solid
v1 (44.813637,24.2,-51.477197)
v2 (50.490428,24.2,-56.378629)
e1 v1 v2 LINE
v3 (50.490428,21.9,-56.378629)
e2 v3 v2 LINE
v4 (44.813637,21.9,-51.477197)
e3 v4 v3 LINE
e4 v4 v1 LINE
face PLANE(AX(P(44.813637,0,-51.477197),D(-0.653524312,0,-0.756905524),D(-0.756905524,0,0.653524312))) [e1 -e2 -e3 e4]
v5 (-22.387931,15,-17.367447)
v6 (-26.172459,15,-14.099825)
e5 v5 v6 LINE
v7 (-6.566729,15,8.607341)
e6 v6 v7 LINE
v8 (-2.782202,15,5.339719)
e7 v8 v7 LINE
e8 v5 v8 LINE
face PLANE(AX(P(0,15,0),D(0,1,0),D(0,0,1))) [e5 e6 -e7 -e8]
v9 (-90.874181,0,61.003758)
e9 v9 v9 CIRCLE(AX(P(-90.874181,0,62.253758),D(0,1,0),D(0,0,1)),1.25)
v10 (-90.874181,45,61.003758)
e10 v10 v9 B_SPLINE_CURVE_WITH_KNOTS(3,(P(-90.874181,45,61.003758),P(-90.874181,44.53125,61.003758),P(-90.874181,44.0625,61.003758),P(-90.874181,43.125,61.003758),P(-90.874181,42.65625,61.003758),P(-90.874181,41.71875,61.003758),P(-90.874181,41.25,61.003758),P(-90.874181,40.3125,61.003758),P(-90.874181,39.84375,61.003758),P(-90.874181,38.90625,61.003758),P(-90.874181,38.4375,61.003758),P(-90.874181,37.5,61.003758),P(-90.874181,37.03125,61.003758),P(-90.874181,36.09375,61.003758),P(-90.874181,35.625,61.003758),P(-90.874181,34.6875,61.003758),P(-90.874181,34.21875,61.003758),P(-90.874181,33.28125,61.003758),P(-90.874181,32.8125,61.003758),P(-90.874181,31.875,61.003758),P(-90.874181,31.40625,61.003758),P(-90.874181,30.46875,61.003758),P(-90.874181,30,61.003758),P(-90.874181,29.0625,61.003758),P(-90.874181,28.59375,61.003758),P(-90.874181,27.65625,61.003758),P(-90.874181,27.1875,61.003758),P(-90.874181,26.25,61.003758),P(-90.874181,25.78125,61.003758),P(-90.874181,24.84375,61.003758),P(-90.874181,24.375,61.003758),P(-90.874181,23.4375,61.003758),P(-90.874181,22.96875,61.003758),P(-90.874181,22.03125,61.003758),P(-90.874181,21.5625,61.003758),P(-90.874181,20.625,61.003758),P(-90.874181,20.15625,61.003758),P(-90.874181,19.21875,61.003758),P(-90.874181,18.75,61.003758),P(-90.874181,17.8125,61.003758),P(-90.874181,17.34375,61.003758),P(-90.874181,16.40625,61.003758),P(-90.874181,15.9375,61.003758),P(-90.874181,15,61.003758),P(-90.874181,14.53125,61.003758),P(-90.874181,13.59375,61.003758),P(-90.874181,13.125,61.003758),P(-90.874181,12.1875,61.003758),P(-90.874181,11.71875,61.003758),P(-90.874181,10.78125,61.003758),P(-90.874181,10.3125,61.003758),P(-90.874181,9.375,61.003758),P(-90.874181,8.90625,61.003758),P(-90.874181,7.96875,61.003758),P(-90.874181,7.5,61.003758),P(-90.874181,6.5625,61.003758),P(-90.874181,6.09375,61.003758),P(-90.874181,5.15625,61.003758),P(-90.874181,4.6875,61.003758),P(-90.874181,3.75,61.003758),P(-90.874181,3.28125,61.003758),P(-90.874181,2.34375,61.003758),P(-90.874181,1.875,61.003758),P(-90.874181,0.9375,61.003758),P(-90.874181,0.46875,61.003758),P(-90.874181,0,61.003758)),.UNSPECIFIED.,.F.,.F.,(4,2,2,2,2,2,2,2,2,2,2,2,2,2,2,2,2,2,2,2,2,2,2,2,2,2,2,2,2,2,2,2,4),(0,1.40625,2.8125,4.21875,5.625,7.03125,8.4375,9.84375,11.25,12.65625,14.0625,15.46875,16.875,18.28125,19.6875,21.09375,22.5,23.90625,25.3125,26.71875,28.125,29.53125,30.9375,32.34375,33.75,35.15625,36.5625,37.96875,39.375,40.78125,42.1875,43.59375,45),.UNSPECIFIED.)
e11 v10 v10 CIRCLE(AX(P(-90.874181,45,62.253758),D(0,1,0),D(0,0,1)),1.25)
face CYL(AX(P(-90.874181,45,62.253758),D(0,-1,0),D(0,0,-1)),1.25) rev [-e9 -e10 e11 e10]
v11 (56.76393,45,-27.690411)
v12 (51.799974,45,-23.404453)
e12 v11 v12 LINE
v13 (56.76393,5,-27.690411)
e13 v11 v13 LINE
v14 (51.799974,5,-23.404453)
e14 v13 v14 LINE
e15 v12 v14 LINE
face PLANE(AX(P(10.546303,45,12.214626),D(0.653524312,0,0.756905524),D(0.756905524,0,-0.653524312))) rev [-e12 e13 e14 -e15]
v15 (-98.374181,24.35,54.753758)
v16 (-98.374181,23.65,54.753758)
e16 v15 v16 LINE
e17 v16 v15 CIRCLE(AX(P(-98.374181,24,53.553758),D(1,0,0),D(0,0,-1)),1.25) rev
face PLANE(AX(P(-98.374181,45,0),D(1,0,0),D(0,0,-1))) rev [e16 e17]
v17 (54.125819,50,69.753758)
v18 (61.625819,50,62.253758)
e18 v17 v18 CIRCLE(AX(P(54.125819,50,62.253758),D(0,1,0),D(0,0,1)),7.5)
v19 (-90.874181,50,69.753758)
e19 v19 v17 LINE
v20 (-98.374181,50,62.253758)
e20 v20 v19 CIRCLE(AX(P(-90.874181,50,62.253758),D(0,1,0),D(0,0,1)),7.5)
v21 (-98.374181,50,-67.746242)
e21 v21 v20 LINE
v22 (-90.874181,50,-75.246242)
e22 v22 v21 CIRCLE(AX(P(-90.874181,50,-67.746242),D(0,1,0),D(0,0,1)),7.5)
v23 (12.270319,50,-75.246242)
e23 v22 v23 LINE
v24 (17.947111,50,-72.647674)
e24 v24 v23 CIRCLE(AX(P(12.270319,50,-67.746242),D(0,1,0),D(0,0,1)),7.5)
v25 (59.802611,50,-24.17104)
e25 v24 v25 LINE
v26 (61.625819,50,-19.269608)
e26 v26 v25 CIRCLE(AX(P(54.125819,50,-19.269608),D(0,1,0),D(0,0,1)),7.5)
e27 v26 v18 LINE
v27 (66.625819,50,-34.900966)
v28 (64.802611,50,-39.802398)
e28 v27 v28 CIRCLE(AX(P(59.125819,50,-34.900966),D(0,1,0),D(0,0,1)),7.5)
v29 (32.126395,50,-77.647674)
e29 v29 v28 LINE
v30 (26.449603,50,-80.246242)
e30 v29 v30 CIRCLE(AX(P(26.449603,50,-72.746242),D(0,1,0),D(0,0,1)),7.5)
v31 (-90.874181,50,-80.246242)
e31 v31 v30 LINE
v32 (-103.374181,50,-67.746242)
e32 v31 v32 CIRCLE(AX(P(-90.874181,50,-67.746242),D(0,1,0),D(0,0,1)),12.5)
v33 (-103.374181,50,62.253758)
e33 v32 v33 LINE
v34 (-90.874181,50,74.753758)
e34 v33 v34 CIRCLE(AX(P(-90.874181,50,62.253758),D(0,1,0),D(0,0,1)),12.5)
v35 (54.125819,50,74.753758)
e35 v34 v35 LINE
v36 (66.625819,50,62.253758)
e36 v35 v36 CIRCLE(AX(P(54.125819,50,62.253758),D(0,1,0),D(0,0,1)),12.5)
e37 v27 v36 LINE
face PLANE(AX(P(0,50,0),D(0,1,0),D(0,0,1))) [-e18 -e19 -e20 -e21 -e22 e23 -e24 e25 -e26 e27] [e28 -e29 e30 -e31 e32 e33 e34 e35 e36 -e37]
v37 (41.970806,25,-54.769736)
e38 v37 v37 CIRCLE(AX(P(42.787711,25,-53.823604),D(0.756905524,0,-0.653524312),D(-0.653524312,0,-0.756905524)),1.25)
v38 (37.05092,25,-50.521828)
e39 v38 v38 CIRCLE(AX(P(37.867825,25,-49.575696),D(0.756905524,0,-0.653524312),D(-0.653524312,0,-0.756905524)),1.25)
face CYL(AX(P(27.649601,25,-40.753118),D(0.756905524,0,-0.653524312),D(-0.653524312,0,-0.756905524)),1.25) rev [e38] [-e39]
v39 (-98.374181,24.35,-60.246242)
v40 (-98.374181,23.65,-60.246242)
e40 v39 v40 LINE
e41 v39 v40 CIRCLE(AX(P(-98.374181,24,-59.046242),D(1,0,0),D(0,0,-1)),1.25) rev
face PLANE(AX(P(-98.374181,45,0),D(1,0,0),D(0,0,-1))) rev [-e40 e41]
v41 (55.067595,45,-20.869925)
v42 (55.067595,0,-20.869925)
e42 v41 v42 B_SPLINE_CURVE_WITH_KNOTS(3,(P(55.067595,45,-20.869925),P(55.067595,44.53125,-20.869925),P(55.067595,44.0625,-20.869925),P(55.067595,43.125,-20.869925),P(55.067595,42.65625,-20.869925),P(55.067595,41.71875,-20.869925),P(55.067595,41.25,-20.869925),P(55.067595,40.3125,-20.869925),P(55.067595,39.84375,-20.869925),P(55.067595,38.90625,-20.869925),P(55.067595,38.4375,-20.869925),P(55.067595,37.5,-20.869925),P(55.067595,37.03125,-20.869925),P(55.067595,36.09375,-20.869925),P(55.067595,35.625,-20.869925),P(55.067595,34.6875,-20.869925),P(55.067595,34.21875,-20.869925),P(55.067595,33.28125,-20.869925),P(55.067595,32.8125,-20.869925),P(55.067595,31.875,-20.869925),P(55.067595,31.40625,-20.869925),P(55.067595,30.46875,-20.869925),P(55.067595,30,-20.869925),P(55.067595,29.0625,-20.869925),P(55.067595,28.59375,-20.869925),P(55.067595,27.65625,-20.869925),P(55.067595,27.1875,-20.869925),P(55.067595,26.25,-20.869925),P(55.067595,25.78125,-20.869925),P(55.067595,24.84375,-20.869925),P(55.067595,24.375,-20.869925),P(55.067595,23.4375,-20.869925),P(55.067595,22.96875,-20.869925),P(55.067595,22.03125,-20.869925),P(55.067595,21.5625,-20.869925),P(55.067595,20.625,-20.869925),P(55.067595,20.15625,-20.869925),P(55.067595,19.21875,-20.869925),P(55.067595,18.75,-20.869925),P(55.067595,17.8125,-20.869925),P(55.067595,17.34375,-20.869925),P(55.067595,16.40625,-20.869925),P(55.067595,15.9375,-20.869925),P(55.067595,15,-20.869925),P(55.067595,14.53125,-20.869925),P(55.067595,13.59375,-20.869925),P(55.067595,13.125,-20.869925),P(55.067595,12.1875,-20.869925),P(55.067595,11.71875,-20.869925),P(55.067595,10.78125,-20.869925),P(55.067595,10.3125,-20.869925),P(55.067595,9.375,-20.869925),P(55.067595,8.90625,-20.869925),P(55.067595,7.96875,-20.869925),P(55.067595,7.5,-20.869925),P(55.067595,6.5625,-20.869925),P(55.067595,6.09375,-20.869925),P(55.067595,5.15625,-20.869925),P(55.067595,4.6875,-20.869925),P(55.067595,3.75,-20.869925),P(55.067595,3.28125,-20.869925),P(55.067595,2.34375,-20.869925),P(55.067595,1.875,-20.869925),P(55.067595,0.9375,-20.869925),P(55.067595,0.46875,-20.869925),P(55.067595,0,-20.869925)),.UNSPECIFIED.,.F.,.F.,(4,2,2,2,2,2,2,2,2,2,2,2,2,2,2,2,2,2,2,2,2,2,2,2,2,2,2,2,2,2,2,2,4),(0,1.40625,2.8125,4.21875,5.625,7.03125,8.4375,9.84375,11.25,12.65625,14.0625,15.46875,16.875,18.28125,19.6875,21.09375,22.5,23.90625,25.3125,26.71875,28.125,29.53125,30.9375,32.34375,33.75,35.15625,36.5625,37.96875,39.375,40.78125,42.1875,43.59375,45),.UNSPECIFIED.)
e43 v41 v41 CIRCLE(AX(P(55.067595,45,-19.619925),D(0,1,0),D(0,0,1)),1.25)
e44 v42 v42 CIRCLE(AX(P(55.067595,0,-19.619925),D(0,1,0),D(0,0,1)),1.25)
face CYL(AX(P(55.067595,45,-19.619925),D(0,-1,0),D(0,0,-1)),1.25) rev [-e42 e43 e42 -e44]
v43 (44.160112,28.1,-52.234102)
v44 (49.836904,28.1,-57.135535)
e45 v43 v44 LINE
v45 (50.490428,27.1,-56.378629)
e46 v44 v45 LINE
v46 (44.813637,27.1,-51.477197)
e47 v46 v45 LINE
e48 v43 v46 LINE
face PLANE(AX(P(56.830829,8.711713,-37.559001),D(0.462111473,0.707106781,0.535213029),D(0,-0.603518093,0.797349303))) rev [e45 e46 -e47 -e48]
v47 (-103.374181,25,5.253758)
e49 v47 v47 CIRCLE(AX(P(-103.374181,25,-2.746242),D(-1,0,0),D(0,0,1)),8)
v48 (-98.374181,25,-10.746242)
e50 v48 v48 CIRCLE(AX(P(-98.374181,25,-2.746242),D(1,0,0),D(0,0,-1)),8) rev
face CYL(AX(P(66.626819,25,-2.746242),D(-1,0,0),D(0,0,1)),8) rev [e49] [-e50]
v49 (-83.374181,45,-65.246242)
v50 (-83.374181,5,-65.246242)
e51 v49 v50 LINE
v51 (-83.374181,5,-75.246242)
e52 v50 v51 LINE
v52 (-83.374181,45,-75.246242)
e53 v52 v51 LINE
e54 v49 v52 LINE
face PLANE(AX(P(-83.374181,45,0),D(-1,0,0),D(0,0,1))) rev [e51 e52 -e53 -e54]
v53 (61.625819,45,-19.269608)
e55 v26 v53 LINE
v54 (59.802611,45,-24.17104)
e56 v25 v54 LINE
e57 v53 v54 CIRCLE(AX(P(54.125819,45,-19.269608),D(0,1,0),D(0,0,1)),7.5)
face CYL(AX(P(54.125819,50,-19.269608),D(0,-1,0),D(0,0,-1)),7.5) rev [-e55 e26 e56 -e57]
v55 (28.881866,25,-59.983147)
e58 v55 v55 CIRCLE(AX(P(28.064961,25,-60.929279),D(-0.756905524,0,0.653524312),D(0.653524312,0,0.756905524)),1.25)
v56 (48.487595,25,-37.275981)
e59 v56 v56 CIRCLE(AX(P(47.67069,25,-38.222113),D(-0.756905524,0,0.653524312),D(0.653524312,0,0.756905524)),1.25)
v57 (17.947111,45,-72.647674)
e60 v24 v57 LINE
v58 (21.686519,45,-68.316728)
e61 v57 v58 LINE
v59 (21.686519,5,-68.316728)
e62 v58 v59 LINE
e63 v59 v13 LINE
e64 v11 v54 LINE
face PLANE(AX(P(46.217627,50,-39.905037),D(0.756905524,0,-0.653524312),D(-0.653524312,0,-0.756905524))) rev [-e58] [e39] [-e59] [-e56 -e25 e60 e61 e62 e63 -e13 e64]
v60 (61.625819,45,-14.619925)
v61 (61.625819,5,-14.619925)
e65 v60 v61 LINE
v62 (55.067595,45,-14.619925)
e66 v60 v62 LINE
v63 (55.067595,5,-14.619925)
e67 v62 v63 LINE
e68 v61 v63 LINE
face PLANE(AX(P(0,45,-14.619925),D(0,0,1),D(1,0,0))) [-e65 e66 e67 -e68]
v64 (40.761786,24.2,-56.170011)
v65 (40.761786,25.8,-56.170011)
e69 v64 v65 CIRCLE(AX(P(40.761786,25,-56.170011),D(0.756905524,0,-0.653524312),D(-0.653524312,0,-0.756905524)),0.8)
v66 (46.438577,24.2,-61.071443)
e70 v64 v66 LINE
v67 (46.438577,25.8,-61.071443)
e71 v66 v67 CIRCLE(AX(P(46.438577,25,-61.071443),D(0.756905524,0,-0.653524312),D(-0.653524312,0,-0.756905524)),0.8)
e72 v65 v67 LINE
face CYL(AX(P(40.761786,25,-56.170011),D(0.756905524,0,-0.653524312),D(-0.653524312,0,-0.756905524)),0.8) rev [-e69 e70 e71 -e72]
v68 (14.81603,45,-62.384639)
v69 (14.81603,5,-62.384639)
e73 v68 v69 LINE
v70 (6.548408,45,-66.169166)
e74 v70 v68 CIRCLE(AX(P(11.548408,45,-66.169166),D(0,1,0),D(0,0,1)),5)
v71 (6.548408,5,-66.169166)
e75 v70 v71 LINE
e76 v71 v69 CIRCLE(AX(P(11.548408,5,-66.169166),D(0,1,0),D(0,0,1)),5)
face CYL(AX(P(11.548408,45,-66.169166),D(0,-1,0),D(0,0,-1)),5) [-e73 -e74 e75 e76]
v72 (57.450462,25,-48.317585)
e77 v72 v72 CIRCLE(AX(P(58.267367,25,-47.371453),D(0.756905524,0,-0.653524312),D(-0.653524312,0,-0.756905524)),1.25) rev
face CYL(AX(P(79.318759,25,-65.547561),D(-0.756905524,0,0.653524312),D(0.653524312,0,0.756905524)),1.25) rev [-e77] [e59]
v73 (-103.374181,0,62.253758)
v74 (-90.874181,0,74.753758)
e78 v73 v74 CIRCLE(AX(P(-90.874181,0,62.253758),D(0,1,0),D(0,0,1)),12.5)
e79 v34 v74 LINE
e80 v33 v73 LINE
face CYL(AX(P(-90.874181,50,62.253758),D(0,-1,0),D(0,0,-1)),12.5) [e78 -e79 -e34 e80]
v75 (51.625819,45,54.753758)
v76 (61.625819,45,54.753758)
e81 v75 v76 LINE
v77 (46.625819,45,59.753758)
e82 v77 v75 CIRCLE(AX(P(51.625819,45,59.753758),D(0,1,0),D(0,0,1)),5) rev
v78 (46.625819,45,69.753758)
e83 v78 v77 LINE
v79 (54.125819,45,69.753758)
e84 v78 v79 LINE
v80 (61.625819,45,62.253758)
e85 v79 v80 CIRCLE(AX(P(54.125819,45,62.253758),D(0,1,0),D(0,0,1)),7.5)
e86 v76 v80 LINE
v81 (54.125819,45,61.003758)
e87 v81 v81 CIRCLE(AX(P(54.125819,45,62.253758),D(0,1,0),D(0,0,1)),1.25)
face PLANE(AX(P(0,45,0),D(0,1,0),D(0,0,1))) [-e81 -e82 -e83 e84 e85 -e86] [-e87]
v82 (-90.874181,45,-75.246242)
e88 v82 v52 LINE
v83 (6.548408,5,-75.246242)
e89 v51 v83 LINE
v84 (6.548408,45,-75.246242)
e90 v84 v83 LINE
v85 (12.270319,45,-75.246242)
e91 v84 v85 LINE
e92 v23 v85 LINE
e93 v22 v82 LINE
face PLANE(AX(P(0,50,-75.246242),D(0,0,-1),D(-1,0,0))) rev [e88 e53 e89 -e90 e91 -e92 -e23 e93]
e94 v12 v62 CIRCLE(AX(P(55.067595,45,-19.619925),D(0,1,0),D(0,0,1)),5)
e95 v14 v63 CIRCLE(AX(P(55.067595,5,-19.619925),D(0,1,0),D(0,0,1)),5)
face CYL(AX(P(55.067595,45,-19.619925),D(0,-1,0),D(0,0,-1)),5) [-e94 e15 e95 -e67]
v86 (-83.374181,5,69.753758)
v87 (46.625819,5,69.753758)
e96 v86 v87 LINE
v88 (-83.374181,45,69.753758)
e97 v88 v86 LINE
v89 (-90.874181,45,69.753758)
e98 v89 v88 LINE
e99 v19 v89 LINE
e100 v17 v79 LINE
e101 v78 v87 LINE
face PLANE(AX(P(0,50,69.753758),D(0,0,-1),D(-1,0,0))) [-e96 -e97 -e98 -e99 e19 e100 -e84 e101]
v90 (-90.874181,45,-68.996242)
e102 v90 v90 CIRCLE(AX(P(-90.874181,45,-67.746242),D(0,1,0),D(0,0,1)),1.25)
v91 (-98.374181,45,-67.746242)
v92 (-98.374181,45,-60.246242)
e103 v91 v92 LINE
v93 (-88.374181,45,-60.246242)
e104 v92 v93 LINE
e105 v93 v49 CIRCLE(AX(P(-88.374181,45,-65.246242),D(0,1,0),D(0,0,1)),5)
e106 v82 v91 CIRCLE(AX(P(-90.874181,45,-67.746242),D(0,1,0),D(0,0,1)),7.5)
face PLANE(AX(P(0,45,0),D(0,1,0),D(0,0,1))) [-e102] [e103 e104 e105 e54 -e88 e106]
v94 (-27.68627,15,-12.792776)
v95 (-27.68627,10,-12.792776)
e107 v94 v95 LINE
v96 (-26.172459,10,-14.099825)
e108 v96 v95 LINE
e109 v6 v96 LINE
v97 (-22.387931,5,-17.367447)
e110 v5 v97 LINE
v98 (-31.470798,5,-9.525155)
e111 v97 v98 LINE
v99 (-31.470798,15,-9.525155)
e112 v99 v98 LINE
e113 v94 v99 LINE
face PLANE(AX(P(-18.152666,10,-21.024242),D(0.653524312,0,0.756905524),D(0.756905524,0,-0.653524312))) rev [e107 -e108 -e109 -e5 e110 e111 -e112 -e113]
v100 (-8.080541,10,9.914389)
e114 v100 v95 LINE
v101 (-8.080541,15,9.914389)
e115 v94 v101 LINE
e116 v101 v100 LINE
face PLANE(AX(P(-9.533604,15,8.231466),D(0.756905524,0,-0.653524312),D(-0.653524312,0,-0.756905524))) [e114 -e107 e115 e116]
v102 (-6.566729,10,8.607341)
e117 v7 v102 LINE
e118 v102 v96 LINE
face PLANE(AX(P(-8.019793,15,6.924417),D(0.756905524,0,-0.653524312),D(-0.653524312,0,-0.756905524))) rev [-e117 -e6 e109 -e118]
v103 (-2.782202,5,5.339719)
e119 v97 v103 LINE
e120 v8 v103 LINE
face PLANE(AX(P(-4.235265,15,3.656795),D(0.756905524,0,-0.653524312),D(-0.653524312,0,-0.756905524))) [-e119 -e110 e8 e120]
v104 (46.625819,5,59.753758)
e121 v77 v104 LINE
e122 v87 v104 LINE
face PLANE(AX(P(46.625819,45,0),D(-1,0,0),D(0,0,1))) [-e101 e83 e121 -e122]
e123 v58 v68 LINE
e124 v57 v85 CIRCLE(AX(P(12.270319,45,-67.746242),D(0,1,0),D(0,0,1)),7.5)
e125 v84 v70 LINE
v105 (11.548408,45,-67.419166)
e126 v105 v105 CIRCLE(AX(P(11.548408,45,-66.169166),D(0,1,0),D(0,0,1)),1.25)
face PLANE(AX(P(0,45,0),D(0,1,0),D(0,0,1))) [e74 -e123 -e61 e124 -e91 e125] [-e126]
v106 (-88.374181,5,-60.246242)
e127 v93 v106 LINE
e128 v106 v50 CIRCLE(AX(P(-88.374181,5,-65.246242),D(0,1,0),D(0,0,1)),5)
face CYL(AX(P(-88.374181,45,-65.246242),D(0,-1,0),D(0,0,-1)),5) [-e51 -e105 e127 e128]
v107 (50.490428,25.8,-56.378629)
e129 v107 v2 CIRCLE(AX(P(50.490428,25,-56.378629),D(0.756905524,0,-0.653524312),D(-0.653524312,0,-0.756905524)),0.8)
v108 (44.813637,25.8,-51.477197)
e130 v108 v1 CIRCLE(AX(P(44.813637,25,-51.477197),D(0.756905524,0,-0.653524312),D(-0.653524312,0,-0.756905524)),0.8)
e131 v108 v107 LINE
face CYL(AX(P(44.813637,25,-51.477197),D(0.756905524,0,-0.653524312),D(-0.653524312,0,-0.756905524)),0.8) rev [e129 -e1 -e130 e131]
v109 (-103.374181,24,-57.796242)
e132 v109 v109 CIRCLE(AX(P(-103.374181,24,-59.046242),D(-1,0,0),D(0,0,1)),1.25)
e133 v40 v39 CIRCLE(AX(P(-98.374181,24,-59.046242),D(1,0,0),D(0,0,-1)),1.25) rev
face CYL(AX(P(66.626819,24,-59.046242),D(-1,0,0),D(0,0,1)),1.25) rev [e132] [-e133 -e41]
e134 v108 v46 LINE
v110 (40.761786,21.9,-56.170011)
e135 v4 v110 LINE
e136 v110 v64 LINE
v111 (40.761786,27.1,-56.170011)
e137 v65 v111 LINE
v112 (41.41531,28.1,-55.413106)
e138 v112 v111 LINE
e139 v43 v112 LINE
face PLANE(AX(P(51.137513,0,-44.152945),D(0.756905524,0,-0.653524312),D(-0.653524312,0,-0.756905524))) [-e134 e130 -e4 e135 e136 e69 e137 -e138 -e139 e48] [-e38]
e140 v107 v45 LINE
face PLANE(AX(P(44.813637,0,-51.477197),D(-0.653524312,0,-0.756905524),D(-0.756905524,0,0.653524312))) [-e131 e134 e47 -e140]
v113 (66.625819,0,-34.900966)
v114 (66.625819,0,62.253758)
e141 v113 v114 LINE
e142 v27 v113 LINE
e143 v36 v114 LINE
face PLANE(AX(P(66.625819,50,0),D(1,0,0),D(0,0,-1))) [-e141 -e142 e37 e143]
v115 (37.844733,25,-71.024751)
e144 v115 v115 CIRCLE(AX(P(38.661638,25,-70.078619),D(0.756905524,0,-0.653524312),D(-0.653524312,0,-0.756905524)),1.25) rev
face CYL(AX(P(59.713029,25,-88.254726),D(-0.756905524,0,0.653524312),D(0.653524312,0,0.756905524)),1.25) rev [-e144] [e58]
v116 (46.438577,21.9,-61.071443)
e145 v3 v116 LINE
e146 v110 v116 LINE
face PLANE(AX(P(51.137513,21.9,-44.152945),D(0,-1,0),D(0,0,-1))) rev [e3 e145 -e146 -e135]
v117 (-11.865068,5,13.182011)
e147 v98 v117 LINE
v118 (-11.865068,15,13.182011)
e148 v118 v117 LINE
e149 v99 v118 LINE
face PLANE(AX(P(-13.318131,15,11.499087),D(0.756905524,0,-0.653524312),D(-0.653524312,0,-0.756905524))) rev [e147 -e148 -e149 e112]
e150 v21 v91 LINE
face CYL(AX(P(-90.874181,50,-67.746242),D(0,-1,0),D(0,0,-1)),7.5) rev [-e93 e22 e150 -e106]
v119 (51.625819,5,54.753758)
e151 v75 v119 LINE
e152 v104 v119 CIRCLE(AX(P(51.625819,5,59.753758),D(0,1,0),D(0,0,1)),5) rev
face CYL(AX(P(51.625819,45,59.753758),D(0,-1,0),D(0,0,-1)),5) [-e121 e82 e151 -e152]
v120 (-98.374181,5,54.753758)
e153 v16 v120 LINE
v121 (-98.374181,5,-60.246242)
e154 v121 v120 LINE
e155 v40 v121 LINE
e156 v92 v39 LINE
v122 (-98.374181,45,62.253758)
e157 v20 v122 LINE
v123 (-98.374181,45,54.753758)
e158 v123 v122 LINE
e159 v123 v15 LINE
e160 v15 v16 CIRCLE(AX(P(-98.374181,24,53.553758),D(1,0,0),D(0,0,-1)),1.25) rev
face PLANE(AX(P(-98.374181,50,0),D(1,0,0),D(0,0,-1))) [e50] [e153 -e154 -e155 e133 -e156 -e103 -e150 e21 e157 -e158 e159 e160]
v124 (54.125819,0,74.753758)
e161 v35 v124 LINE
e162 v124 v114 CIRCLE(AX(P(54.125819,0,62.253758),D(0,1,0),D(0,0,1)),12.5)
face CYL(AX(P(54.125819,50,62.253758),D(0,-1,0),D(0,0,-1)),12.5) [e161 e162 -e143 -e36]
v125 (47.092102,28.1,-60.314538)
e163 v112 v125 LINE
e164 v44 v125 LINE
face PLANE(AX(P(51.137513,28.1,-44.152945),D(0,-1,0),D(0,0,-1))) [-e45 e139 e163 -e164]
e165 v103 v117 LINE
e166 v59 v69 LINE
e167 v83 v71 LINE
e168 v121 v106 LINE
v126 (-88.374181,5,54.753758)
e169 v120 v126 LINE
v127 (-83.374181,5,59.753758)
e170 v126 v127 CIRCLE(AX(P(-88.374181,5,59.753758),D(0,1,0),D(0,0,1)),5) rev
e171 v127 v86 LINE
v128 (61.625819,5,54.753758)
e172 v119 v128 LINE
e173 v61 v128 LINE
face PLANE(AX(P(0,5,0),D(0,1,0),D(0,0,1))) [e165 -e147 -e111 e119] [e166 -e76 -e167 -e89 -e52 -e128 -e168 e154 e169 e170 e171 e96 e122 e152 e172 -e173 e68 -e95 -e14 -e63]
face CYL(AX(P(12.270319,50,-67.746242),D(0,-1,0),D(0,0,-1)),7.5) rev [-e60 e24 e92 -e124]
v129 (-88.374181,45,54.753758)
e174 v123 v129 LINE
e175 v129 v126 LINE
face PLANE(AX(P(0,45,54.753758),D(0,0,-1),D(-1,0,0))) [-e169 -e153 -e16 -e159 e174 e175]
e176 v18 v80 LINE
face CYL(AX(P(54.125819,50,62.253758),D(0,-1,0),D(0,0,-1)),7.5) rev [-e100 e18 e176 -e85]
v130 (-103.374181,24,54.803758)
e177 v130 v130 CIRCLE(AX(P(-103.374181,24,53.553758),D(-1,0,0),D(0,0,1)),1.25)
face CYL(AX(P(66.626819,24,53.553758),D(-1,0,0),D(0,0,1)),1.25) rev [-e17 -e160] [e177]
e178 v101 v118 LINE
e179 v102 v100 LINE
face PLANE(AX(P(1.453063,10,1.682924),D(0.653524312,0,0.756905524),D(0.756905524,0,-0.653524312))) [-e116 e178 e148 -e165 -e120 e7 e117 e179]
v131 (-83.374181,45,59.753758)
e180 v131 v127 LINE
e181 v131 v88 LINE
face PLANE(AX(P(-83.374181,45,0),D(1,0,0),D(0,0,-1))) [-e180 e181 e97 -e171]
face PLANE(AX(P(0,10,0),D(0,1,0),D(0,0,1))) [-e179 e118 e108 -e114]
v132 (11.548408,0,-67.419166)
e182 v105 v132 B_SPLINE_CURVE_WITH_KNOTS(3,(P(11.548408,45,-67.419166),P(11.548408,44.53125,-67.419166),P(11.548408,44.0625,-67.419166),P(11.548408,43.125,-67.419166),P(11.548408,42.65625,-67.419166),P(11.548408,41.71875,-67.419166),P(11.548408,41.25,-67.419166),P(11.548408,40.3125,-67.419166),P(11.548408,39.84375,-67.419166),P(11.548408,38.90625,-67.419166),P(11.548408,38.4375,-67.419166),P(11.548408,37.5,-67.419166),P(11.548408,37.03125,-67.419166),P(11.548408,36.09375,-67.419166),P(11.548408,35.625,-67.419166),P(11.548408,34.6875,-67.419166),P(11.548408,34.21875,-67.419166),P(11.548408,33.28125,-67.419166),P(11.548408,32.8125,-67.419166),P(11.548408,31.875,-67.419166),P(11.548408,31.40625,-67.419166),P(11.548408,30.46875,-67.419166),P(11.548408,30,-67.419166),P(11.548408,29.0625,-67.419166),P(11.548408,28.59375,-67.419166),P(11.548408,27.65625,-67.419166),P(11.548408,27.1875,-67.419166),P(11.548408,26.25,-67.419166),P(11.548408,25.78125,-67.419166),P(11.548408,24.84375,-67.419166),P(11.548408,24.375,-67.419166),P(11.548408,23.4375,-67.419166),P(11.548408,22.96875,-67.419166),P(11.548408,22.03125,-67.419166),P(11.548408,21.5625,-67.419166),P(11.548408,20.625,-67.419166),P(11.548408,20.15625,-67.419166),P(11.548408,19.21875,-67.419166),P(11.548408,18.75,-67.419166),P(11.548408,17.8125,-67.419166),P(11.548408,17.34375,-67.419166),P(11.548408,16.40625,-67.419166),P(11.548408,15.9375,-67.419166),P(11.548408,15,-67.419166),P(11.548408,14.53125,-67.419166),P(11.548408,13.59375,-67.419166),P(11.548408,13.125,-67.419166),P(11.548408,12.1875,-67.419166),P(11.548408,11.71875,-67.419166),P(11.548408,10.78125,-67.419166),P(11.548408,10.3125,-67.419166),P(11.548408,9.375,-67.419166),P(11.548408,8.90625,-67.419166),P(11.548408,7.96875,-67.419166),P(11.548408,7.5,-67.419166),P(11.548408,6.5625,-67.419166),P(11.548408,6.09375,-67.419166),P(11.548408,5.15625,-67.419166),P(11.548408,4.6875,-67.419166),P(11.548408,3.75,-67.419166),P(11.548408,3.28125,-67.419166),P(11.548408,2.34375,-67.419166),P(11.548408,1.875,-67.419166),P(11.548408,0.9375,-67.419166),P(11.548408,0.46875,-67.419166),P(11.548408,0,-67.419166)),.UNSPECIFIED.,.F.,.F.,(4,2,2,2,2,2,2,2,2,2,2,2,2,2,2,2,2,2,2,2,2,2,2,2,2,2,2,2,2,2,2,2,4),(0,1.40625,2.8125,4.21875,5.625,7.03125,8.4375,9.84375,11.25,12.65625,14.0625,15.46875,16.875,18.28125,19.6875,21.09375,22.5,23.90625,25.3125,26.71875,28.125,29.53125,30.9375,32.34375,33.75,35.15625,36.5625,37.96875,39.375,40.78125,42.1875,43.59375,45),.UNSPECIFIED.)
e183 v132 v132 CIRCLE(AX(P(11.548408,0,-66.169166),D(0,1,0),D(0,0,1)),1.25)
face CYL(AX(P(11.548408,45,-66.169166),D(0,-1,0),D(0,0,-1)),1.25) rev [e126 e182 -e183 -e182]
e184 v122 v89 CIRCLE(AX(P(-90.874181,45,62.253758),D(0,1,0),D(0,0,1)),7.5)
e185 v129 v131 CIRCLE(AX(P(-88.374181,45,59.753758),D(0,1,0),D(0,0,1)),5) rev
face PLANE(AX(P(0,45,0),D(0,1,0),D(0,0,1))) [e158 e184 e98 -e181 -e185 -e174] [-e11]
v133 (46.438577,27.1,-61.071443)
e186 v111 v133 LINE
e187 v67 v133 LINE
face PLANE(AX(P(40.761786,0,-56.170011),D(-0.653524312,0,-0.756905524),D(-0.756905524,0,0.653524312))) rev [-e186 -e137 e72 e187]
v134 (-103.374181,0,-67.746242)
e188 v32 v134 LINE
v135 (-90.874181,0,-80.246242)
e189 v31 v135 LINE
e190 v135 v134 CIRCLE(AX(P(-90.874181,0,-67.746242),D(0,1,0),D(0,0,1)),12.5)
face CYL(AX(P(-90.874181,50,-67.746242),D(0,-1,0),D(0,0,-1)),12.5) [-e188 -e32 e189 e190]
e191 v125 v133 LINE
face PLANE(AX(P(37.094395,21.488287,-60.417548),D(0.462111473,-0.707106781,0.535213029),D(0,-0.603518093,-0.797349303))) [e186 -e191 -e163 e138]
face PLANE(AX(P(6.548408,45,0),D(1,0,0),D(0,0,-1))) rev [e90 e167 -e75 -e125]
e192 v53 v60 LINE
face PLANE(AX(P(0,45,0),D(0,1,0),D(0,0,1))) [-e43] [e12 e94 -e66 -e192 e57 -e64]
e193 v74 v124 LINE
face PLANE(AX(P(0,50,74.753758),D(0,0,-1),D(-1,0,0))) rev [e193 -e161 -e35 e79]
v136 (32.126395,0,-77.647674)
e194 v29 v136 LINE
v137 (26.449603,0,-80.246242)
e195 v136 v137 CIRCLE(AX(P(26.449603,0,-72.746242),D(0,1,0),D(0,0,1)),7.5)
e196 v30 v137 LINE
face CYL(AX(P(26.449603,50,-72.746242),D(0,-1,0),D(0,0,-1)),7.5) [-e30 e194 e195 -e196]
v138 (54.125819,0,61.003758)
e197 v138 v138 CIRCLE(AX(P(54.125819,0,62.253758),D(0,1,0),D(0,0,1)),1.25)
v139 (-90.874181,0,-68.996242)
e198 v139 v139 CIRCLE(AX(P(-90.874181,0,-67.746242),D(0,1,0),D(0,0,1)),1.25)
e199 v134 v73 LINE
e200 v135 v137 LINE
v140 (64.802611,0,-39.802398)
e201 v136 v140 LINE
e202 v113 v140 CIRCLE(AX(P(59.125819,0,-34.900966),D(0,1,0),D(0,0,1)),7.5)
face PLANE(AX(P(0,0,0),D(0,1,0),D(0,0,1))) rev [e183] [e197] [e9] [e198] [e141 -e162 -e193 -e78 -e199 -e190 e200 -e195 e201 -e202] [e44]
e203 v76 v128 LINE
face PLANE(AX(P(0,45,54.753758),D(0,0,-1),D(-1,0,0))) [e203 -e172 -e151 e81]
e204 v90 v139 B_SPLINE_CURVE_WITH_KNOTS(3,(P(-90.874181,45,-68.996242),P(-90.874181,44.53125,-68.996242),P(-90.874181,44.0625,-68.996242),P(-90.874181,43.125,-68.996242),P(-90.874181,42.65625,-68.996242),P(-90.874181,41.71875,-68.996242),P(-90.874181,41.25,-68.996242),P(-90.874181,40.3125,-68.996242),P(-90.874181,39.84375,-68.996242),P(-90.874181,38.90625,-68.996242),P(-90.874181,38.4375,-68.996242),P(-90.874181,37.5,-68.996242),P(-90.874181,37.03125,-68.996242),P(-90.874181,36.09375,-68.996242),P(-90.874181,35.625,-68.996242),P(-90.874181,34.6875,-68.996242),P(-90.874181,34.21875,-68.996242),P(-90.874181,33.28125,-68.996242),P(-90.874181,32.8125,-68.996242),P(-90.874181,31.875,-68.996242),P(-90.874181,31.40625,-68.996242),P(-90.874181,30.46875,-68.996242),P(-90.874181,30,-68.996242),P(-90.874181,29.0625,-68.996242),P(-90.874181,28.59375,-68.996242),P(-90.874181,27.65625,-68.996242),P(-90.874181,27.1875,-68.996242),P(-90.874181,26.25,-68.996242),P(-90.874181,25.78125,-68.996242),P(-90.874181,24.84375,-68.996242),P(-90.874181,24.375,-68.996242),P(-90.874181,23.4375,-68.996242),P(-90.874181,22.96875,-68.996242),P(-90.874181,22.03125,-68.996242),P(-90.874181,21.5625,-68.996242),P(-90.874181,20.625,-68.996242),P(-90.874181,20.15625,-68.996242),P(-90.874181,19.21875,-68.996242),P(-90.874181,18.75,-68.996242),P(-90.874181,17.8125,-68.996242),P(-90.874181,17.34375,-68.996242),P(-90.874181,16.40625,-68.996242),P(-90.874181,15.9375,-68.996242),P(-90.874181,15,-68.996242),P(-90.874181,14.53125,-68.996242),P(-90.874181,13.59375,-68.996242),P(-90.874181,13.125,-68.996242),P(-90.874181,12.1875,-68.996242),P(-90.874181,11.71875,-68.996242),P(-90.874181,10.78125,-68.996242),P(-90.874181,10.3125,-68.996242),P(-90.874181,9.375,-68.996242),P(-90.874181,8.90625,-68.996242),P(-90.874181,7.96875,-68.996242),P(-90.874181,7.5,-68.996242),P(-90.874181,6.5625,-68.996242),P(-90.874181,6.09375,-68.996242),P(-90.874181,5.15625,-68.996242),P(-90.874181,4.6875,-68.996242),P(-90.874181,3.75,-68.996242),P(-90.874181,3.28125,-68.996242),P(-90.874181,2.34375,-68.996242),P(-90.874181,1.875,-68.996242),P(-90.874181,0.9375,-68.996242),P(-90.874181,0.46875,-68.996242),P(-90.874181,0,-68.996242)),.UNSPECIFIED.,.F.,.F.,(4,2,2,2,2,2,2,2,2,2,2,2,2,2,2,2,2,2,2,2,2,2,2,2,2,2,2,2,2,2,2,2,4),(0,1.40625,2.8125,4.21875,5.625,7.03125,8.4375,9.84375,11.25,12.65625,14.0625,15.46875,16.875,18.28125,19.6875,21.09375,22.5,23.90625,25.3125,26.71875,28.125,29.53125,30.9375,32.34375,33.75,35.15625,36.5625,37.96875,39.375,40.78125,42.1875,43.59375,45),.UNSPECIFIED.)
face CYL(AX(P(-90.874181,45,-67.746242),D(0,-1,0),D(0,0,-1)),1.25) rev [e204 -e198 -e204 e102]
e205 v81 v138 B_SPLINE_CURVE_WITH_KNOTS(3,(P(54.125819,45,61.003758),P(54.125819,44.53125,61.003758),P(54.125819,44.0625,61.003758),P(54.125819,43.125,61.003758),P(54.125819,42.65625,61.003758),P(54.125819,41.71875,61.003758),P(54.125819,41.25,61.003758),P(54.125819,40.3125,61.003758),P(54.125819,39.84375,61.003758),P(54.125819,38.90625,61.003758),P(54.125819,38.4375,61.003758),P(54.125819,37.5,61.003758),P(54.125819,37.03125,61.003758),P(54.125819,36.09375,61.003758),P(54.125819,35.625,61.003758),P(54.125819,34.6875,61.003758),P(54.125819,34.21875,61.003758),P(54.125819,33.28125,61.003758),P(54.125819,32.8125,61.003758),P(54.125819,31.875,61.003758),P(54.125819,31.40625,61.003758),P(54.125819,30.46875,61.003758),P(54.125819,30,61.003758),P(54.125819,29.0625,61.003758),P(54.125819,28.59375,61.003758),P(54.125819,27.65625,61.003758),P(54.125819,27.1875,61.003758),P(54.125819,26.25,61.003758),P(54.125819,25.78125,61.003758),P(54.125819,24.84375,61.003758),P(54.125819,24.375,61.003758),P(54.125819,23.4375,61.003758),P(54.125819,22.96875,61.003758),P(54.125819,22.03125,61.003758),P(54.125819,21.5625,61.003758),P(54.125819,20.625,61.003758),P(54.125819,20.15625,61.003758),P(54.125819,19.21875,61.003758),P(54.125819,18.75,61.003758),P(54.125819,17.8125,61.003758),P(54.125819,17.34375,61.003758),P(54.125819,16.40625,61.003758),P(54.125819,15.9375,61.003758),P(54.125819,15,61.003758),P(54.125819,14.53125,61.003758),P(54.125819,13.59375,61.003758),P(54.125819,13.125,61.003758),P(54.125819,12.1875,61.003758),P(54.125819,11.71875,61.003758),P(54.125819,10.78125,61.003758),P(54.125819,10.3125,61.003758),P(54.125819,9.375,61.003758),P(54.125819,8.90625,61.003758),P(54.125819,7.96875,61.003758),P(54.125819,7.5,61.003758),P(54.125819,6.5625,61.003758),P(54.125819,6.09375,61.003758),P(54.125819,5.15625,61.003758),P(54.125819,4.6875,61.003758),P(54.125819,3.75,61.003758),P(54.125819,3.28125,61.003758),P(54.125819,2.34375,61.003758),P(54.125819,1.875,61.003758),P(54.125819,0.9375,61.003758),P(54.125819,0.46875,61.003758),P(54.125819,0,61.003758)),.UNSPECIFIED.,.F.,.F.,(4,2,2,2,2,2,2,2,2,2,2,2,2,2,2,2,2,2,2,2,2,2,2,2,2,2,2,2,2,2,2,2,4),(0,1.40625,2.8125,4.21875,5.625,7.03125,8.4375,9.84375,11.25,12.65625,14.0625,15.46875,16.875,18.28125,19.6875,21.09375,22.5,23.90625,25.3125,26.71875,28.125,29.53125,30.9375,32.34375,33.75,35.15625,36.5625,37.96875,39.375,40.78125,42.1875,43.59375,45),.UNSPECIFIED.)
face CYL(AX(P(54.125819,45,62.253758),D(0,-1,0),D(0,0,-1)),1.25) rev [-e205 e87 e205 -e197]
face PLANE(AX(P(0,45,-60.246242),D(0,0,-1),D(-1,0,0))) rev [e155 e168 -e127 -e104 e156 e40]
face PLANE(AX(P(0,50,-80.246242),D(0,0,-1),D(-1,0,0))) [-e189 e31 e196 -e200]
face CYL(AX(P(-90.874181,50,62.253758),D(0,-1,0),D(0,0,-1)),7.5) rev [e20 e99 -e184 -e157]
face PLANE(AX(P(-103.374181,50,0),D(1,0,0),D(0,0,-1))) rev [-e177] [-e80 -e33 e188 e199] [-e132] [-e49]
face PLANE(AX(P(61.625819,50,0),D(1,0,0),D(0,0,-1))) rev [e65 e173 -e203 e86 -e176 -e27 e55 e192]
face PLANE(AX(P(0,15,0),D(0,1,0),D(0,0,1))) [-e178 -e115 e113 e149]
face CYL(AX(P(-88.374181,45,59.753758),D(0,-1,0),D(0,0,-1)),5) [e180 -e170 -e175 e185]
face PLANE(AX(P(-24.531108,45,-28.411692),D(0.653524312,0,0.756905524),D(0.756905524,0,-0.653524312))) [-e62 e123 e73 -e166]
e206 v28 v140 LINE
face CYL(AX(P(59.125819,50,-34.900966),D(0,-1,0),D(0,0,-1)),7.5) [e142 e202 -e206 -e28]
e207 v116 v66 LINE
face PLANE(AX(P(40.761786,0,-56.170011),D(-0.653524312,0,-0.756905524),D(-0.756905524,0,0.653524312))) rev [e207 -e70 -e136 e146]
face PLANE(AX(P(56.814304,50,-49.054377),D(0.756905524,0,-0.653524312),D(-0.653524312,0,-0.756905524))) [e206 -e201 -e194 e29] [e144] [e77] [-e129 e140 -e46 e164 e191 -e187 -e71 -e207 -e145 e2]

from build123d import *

# Parameters (mm, degrees)
EXTRUDE_2_DEPTH     = 5
EXTRUDE_2_2_DEPTH   = 5
EXTRUDE_3_DEPTH     = 50
EXTRUDE_4_DEPTH     = 10
CUT_EXTRUDE_1_DEPTH = 7.5
SKETCH_9_R          = 1.25
CUT_EXTRUDE_3_DEPTH = 20
SKETCH_10_R         = 8
SKETCH_10_R_2       = 1.25
CUT_EXTRUDE_7_DEPTH = 5
SKETCH_1_9_R        = 1.25
EXTRUDE_5_DEPTH     = 45
SKETCH_14_R         = 1.25
CUT_EXTRUDE_8_DEPTH = 14
EXTRUDE_6_DEPTH     = 15


# Read off the part's stored shape, not the designer's step: 凸台-拉伸4
with BuildPart() as part:
    # 草图1 → 凸台-拉伸2 (new body)
    with BuildSketch(Plane(origin=(0, 0, 0), x_dir=(1, 0, 0), z_dir=(0, 1, 0))):
        with BuildLine():
            Line((6.548408352, 75.246242124), (-83.374180902, 75.246242124))
            Line((-83.374180902, 75.246242124), (-83.374180902, 65.246242124))
            ThreePointArc((-83.374180902, 65.246242124), (-84.838646996, 61.710708218), (-88.374180902, 60.246242124))
            Line((-88.374180902, 60.246242124), (-98.374180902, 60.246242124))
            Line((-98.374180902, 60.246242124), (-98.374180902, -54.753757876))
            Line((-98.374180902, -54.753757876), (-88.374180902, -54.753757876))
            ThreePointArc((-88.374180902, -54.753757876), (-84.838646996, -56.21822397), (-83.374180902, -59.753757876))
            Line((-83.374180902, -59.753757876), (-83.374180902, -69.753757876))
            Line((-83.374180902, -69.753757876), (46.625819098, -69.753757876))
            Line((46.625819098, -69.753757876), (46.625819098, -59.753757876))
            ThreePointArc((46.625819098, -59.753757876), (48.090285193, -56.21822397), (51.625819098, -54.753757876))
            Line((51.625819098, -54.753757876), (61.625819098, -54.753757876))
            Line((61.625819098, -54.753757876), (61.625819098, 14.619924984))
            Line((61.625819098, 14.619924984), (55.067595409, 14.619924984))
            ThreePointArc((55.067595409, 14.619924984), (50.381304866, 17.876743713), (51.799973847, 23.404452606))
            Line((51.799973847, 23.404452606), (56.763929588, 27.690411234))
            Line((56.763929588, 27.690411234), (21.686518841, 68.316728374))
            Line((21.686518841, 68.316728374), (14.816029914, 62.384638559))
            ThreePointArc((14.816029914, 62.384638559), (9.467315828, 61.622843062), (6.548408352, 66.169166182))
            Line((6.548408352, 66.169166182), (6.548408352, 75.246242124))
        make_face()
        Polygon((-31.470797546, 9.525154804), (-22.387931252, 17.367446554), (-2.782201877, -5.33971918), (-11.865068171, -13.18201093), align=None, mode=Mode.SUBTRACT)
    extrude(amount=EXTRUDE_2_DEPTH)

    # 草图1<6> → 凸台-拉伸3 (add)
    with BuildSketch(Plane(origin=(0, 0, 0), x_dir=(1, 0, 0), z_dir=(0, 1, 0))):
        with BuildLine():
            Line((66.625819098, 34.900965901), (66.625819098, -62.253757876))
            ThreePointArc((66.625819098, -62.253757876), (62.964653863, -71.092592641), (54.125819098, -74.753757876))
            Line((54.125819098, -74.753757876), (-90.874180902, -74.753757876))
            ThreePointArc((-90.874180902, -74.753757876), (-99.713015666, -71.092592641), (-103.374180902, -62.253757876))
            Line((-103.374180902, -62.253757876), (-103.374180902, 67.746242124))
            ThreePointArc((-103.374180902, 67.746242124), (-99.713015666, 76.585076889), (-90.874180902, 80.246242124))
            Line((-90.874180902, 80.246242124), (26.449603474, 80.246242124))
            ThreePointArc((26.449603474, 80.246242124), (29.57124226, 79.565726803), (32.126394907, 77.647674468))
            Line((32.126394907, 77.647674468), (64.802610532, 39.802398244))
            ThreePointArc((64.802610532, 39.802398244), (66.155254913, 37.515737807), (66.625819098, 34.900965901))
        make_face()
        with BuildLine():
            ThreePointArc((61.625819098, 19.269608073), (61.155254913, 21.88437998), (59.802610532, 24.171040417))
            Line((59.802610532, 24.171040417), (17.947110848, 72.647674468))
            ThreePointArc((17.947110848, 72.647674468), (15.3919582, 74.565726803), (12.270319414, 75.246242124))
            Line((12.270319414, 75.246242124), (-90.874180902, 75.246242124))
            ThreePointArc((-90.874180902, 75.246242124), (-96.17748176, 73.049542983), (-98.374180902, 67.746242124))
            Line((-98.374180902, 67.746242124), (-98.374180902, -62.253757876))
            ThreePointArc((-98.374180902, -62.253757876), (-96.17748176, -67.557058735), (-90.874180902, -69.753757876))
            Line((-90.874180902, -69.753757876), (54.125819098, -69.753757876))
            ThreePointArc((54.125819098, -69.753757876), (59.429119957, -67.557058735), (61.625819098, -62.253757876))
            Line((61.625819098, -62.253757876), (61.625819098, 19.269608073))
        make_face(mode=Mode.SUBTRACT)
    extrude(amount=EXTRUDE_3_DEPTH)

    # 凸台-拉伸4 outline → 凸台-拉伸4 (add)
    with BuildSketch(Plane(origin=(0, 0, 0), x_dir=(1, 0, 0), z_dir=(0, 1, 0))):
        Polygon((-6.5667295, -8.607340743), (-26.172458875, 14.099824991), (-27.686269924, 12.792776366), (-8.080540549, -9.914389368), align=None)
    extrude(amount=EXTRUDE_4_DEPTH)

    # 草图6 → 切除-拉伸1 (cut)
    with BuildSketch(Plane(origin=(56.814304212, 0, -49.054377198), x_dir=(-0.6535243124977221, 0, -0.7569055244707755), z_dir=(0.7569055244707754, 0, -0.653524312497722))):
        with BuildLine():
            Line((9.676573622, 24.2), (9.676573622, 21.9))
            Line((9.676573622, 21.9), (15.876573622, 21.9))
            Line((15.876573622, 21.9), (15.876573622, 24.2))
            ThreePointArc((15.876573622, 24.2), (16.676573622, 25), (15.876573622, 25.8))
            Line((15.876573622, 25.8), (15.876573622, 27.1))
            Line((15.876573622, 27.1), (14.876573622, 28.1))
            Line((14.876573622, 28.1), (10.676573622, 28.1))
            Line((10.676573622, 28.1), (9.676573622, 27.1))
            Line((9.676573622, 27.1), (9.676573622, 25.8))
            ThreePointArc((9.676573622, 25.8), (8.876573622, 25), (9.676573622, 24.2))
        make_face()
    extrude(amount=-CUT_EXTRUDE_1_DEPTH, mode=Mode.SUBTRACT)

    # 草图9 → 切除-拉伸3 (cut)
    with BuildSketch(Plane(origin=(51.137512779, 0, -44.152944854), x_dir=(-0.6535243124977224, 0, -0.7569055244707754), z_dir=(0.7569055244707754, 0, -0.6535243124977224))):
        with Locations((12.776573622, 25)):
            Circle(SKETCH_9_R)
    extrude(amount=-CUT_EXTRUDE_3_DEPTH, mode=Mode.SUBTRACT)

    # 草图10 → 切除-拉伸7 (cut)
    with BuildSketch(Plane.ZY.offset(103.374180902)):
        with Locations((-2.746242124, 25)):
            Circle(SKETCH_10_R)
        with Locations((-59.046242124, 24)):
            Circle(SKETCH_10_R_2)
        with Locations((53.553757876, 24)):
            Circle(SKETCH_10_R_2)
    extrude(amount=-CUT_EXTRUDE_7_DEPTH, mode=Mode.SUBTRACT)

    # 草图1<9> → 凸台-拉伸5 (add)
    # profile 1 of 5: a face of its own
    with BuildSketch(Plane(origin=(0, 0, 0), x_dir=(1, 0, 0), z_dir=(0, 1, 0))):
        with BuildLine():
            Line((-83.374180902, 75.246242124), (-90.874180902, 75.246242124))
            ThreePointArc((-90.874180902, 75.246242124), (-96.17748176, 73.049542983), (-98.374180902, 67.746242124))
            Line((-98.374180902, 67.746242124), (-98.374180902, 60.246242124))
            Line((-98.374180902, 60.246242124), (-88.374180902, 60.246242124))
            ThreePointArc((-88.374180902, 60.246242124), (-84.838646996, 61.710708218), (-83.374180902, 65.246242124))
            Line((-83.374180902, 65.246242124), (-83.374180902, 75.246242124))
        make_face()
        with Locations(Location((-90.874180902, 67.746242124, 0), (0, 0, 90))):
            Circle(SKETCH_1_9_R, mode=Mode.SUBTRACT)
    # profile 2 of 5: a face of its own
    with BuildSketch(Plane(origin=(0, 0, 0), x_dir=(1, 0, 0), z_dir=(0, 1, 0))):
        with BuildLine():
            Line((-88.374180902, -54.753757876), (-98.374180902, -54.753757876))
            Line((-98.374180902, -54.753757876), (-98.374180902, -62.253757876))
            ThreePointArc((-98.374180902, -62.253757876), (-96.17748176, -67.557058735), (-90.874180902, -69.753757876))
            Line((-90.874180902, -69.753757876), (-83.374180902, -69.753757876))
            Line((-83.374180902, -69.753757876), (-83.374180902, -59.753757876))
            ThreePointArc((-83.374180902, -59.753757876), (-84.838646996, -56.21822397), (-88.374180902, -54.753757876))
        make_face()
        with Locations(Location((-90.874180902, -62.253757876, 0), (0, 0, 90))):
            Circle(SKETCH_1_9_R, mode=Mode.SUBTRACT)
    # profile 3 of 5: a face of its own
    with BuildSketch(Plane(origin=(0, 0, 0), x_dir=(1, 0, 0), z_dir=(0, 1, 0))):
        with BuildLine():
            Line((46.625819098, -59.753757876), (46.625819098, -69.753757876))
            Line((46.625819098, -69.753757876), (54.125819098, -69.753757876))
            ThreePointArc((54.125819098, -69.753757876), (59.429119957, -67.557058735), (61.625819098, -62.253757876))
            Line((61.625819098, -62.253757876), (61.625819098, -54.753757876))
            Line((61.625819098, -54.753757876), (51.625819098, -54.753757876))
            ThreePointArc((51.625819098, -54.753757876), (48.090285193, -56.21822397), (46.625819098, -59.753757876))
        make_face()
        with Locations(Location((54.125819098, -62.253757876, 0), (0, 0, 90))):
            Circle(SKETCH_1_9_R, mode=Mode.SUBTRACT)
    # profile 4 of 5: a face of its own
    with BuildSketch(Plane(origin=(0, 0, 0), x_dir=(1, 0, 0), z_dir=(0, 1, 0))):
        with BuildLine():
            Line((59.802610532, 24.171040417), (56.763929588, 27.690411234))
            Line((56.763929588, 27.690411234), (51.799973847, 23.404452606))
            ThreePointArc((51.799973847, 23.404452606), (50.381304866, 17.876743713), (55.067595409, 14.619924984))
            Line((55.067595409, 14.619924984), (61.625819098, 14.619924984))
            Line((61.625819098, 14.619924984), (61.625819098, 19.269608073))
            ThreePointArc((61.625819098, 19.269608073), (61.155254913, 21.88437998), (59.802610532, 24.171040417))
        make_face()
        with Locations(Location((55.067595409, 19.619924984, 0), (0, 0, 90))):
            Circle(SKETCH_1_9_R, mode=Mode.SUBTRACT)
    # profile 5 of 5: a face of its own
    with BuildSketch(Plane(origin=(0, 0, 0), x_dir=(1, 0, 0), z_dir=(0, 1, 0))):
        with BuildLine():
            Line((12.270319414, 75.246242124), (6.548408352, 75.246242124))
            Line((6.548408352, 75.246242124), (6.548408352, 66.169166182))
            ThreePointArc((6.548408352, 66.169166182), (9.467315828, 61.622843062), (14.816029914, 62.384638559))
            Line((14.816029914, 62.384638559), (21.686518841, 68.316728374))
            Line((21.686518841, 68.316728374), (17.947110848, 72.647674468))
            ThreePointArc((17.947110848, 72.647674468), (15.3919582, 74.565726803), (12.270319414, 75.246242124))
        make_face()
        with Locations(Location((11.548408352, 66.169166182, 0), (0, 0, 90))):
            Circle(SKETCH_1_9_R, mode=Mode.SUBTRACT)
    extrude(amount=EXTRUDE_5_DEPTH)

    # 草图14 → 切除-拉伸8 (cut)
    with BuildSketch(Plane(origin=(46.21762687, 0, -39.905036823), x_dir=(0.6535243124977226, 0, 0.7569055244707751), z_dir=(-0.7569055244707751, 0, 0.6535243124977226))):
        with Locations((2.223426378, 25)):
            Circle(SKETCH_14_R)
        with Locations((-27.776573622, 25)):
            Circle(SKETCH_14_R)
    extrude(amount=-CUT_EXTRUDE_8_DEPTH, mode=Mode.SUBTRACT)



with BuildPart() as body_2:
    # 草图1 → Extrude 2 2 (new body)
    with BuildSketch(Plane(origin=(0, 0, 0), x_dir=(1, 0, 0), z_dir=(0, 1, 0))):
        Polygon((-9.834351062, -4.822813121), (-22.904837312, 10.315297369), (-24.418648361, 9.008248744), (-11.348162111, -6.129861746), align=None)
    extrude(amount=EXTRUDE_2_2_DEPTH)


with BuildPart() as part_1:
    add(part.part)

    add(body_2.part)  # 凸台-拉伸6 merges body 2
    # 草图1<10> → 凸台-拉伸6 (add)
    with BuildSketch(Plane(origin=(0, 0, 0), x_dir=(1, 0, 0), z_dir=(0, 1, 0))):
        Polygon((-26.172458875, 14.099824991), (-22.904837312, 10.315297369), (-9.834351062, -4.822813121), (-6.5667295, -8.607340743), (-2.782201877, -5.33971918), (-22.387931252, 17.367446554), align=None)
        Polygon((-11.348162111, -6.129861746), (-24.418648361, 9.008248744), (-27.686269924, 12.792776366), (-31.470797546, 9.525154804), (-11.865068171, -13.18201093), (-8.080540549, -9.914389368), align=None)
    extrude(amount=EXTRUDE_6_DEPTH)


solid = part_1.part
